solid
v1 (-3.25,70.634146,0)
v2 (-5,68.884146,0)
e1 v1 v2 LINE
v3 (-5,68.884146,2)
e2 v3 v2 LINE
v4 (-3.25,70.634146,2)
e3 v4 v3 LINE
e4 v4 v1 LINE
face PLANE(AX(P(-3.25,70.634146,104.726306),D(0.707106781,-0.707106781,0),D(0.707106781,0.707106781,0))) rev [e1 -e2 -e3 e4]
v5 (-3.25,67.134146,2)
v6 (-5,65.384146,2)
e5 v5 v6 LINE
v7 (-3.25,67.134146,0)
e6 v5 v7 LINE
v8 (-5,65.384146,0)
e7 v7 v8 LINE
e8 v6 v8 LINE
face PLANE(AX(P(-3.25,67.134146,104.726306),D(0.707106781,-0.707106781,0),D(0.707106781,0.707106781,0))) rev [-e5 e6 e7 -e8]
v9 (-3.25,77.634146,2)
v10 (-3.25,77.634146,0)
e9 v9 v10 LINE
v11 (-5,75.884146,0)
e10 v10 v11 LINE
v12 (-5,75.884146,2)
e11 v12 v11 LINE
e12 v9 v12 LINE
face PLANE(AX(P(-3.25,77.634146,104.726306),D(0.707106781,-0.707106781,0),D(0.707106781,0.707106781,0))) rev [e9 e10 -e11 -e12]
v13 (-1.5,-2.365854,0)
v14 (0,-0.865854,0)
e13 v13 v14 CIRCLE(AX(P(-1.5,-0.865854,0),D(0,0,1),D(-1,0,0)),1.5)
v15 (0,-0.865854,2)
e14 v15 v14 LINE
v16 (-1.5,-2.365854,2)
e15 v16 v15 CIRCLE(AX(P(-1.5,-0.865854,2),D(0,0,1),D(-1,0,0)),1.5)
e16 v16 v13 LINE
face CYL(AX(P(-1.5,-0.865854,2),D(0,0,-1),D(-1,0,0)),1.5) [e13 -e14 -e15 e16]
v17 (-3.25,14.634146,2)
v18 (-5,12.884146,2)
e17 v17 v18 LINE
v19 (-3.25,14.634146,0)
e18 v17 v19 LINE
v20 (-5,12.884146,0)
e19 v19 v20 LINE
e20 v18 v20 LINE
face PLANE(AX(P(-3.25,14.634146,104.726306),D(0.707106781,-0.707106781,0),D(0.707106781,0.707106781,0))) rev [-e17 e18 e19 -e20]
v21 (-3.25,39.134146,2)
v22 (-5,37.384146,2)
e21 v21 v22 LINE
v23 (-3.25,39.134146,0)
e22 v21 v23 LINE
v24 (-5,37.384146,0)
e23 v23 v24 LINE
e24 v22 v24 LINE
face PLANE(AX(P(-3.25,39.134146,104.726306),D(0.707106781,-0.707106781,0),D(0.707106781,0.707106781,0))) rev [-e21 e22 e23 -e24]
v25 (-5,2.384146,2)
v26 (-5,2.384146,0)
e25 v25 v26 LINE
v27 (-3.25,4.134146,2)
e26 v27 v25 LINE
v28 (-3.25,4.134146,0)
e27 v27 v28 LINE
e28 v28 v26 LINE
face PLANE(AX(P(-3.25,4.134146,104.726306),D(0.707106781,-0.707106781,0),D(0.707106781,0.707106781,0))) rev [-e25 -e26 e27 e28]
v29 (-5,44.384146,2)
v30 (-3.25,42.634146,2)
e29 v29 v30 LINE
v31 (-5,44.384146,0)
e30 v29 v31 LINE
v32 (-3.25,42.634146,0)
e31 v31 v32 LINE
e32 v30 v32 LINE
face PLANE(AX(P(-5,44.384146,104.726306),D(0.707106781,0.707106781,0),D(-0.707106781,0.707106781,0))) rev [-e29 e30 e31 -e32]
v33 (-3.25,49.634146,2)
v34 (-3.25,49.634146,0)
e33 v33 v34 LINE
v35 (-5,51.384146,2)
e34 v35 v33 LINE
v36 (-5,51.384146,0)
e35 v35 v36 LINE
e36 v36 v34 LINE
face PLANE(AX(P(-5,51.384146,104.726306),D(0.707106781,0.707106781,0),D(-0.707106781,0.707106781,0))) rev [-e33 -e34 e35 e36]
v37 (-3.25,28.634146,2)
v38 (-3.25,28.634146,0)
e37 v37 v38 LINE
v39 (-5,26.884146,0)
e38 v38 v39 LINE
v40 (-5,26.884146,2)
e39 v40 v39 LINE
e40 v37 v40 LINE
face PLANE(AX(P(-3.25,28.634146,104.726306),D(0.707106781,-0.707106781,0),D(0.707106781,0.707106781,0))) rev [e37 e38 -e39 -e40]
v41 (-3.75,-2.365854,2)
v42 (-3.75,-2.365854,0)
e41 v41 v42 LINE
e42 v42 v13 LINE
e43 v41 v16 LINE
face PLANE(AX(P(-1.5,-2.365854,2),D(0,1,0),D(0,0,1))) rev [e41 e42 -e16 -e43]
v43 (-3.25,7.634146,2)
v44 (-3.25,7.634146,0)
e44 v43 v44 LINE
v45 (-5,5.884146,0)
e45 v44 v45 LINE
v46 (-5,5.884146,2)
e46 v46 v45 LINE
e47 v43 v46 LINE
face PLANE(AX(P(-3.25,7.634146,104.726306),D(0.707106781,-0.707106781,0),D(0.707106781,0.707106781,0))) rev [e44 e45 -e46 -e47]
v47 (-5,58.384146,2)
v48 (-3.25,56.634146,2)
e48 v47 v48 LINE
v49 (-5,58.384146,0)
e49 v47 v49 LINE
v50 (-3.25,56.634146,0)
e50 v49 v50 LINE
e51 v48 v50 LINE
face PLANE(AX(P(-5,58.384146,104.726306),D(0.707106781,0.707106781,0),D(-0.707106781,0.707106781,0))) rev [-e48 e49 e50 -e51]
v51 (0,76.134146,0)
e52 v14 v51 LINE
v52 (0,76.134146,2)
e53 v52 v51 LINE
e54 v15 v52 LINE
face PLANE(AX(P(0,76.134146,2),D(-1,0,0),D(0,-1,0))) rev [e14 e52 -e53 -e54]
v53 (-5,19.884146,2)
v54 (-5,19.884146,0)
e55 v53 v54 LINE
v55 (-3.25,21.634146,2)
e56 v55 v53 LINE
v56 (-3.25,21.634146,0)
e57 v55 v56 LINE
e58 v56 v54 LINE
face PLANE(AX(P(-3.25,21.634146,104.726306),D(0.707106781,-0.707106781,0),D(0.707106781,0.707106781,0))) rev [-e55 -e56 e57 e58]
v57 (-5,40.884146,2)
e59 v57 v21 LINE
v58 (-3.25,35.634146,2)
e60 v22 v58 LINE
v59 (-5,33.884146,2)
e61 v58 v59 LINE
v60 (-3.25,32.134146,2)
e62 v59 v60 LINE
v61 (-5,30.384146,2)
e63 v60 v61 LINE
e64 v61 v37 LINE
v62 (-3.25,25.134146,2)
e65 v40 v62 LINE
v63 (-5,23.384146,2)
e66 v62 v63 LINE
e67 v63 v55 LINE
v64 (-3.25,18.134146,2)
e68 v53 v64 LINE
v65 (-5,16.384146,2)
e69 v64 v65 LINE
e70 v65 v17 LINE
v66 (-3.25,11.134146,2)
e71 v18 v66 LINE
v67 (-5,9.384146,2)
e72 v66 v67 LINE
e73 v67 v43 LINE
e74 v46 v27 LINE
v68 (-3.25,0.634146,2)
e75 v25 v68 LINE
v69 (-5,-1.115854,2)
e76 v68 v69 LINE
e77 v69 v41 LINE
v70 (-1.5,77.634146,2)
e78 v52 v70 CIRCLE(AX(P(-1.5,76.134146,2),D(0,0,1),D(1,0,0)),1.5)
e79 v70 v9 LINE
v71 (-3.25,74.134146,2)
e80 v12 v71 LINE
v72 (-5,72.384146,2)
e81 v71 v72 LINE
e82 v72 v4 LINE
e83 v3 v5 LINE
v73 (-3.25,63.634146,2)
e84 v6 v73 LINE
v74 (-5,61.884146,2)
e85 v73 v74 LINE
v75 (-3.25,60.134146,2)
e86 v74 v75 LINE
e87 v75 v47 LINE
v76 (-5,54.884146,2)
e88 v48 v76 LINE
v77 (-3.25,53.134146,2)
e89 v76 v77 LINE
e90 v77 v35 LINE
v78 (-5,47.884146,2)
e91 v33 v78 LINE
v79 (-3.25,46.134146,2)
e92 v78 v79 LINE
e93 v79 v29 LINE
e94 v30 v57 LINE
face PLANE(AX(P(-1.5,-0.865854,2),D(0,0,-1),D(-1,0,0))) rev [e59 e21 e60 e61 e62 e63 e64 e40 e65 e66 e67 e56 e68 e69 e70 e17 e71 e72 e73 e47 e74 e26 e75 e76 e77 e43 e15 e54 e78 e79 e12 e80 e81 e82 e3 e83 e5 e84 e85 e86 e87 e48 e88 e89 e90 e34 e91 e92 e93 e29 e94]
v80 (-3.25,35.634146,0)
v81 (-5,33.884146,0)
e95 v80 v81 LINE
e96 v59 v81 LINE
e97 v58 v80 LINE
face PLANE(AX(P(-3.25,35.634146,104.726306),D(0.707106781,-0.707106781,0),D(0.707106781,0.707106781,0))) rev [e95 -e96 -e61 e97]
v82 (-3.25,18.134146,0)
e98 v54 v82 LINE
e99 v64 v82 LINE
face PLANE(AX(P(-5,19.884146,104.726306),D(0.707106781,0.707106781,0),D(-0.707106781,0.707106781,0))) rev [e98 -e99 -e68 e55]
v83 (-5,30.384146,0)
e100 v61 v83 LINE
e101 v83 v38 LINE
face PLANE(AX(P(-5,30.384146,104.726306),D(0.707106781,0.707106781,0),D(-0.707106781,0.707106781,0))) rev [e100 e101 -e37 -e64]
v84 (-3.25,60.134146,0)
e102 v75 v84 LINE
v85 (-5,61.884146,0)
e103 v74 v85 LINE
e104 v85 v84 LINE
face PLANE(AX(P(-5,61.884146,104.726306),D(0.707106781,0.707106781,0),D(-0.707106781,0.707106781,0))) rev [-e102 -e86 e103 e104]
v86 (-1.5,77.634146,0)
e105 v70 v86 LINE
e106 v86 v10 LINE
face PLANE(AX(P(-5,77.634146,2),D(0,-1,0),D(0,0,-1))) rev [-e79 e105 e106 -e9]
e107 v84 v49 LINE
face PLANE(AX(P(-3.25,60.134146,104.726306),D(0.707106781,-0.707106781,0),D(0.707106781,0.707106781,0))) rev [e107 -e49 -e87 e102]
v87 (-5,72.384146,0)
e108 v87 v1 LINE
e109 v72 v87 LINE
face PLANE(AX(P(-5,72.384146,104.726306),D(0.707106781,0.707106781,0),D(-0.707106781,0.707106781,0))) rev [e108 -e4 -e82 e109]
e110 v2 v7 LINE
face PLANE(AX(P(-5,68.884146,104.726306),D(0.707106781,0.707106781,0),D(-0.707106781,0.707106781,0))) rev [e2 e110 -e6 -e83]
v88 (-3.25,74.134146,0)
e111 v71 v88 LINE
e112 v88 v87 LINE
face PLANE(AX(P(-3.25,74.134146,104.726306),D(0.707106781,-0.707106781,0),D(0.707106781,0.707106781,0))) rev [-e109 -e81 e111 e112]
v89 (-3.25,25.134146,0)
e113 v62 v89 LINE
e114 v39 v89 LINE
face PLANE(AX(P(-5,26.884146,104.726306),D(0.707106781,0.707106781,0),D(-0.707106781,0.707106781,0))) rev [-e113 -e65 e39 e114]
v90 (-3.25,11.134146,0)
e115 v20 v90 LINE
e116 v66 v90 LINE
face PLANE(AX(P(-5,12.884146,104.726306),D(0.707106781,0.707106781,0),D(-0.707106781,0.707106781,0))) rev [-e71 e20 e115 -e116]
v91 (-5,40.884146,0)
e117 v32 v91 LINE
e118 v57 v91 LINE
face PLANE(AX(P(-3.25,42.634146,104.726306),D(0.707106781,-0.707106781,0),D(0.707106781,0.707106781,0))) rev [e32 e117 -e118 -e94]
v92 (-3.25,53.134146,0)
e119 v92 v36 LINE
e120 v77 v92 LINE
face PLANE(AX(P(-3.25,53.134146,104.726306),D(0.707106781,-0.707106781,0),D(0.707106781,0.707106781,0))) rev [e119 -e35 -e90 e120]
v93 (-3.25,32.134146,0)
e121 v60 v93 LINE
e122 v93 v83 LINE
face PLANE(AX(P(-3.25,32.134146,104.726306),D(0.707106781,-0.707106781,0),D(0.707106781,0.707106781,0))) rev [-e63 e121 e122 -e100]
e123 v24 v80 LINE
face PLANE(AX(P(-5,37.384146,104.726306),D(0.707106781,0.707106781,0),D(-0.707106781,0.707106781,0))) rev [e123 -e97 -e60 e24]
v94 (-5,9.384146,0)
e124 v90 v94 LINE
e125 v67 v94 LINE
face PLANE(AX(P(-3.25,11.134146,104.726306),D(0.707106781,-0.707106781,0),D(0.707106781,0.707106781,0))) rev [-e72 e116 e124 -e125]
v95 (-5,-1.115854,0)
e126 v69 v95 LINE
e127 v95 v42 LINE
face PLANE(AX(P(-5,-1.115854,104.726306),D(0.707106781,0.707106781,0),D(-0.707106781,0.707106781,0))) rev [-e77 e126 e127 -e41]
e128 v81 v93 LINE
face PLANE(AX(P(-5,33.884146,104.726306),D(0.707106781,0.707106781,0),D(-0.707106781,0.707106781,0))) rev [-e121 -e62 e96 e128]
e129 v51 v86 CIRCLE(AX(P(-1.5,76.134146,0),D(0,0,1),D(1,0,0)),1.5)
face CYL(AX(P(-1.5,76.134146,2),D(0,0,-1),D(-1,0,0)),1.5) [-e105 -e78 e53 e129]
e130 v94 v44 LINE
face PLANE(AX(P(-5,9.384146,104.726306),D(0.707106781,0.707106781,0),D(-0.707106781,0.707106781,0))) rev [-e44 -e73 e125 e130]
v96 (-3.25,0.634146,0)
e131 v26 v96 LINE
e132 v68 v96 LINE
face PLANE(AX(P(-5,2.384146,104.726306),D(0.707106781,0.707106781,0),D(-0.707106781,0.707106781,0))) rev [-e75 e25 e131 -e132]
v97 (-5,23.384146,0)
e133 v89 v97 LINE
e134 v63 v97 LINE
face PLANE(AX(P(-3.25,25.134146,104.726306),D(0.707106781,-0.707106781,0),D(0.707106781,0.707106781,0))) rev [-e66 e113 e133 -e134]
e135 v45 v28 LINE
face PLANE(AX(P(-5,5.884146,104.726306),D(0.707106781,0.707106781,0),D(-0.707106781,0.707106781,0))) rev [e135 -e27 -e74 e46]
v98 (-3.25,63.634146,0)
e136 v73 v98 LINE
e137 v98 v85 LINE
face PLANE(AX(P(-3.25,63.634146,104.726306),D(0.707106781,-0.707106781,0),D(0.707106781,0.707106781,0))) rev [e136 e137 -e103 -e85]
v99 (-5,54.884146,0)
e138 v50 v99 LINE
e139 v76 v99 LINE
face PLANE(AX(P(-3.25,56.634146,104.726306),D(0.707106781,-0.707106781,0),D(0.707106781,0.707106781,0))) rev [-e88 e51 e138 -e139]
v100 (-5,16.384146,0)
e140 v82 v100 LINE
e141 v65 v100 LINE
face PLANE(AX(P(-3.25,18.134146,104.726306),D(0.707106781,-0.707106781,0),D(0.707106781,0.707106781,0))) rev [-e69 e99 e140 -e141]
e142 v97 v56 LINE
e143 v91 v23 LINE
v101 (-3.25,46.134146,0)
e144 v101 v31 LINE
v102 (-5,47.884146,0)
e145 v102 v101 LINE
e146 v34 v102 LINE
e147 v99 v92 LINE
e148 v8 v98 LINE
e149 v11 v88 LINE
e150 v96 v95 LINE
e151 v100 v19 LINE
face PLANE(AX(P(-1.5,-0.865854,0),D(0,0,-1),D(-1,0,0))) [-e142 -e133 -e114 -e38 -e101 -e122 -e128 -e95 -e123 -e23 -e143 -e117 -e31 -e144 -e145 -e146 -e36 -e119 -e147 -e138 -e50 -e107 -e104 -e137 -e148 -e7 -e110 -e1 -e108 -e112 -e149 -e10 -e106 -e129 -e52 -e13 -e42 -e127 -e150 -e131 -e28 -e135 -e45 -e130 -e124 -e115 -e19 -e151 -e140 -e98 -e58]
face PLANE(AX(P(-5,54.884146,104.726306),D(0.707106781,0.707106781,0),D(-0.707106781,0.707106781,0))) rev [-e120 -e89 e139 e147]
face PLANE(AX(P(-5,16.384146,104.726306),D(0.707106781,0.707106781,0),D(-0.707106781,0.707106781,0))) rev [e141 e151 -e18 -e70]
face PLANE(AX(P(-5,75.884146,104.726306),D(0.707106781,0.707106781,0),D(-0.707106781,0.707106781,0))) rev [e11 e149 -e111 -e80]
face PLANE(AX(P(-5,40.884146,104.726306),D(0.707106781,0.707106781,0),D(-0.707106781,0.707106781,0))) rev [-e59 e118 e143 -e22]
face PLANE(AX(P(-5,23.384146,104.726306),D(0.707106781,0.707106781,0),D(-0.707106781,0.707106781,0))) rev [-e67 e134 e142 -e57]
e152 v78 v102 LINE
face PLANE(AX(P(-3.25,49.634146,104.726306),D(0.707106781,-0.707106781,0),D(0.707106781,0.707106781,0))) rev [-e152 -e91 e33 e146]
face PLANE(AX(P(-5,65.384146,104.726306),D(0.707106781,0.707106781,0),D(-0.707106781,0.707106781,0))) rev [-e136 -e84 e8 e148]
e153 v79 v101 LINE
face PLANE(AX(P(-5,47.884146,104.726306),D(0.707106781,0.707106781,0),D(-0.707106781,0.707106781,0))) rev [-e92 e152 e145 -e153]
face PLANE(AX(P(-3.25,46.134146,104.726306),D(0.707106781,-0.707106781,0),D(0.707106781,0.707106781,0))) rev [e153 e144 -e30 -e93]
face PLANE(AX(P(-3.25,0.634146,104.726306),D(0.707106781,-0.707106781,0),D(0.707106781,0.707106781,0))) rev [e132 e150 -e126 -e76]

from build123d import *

# Parameters (mm, degrees)
BOSS_EXTRUDE1_DEPTH = 2
CUT_EXTRUDE4_START  = -2
CUT_EXTRUDE4_DEPTH  = 2


# Read off the part's stored shape, not the designer's step: Cut-Extrude4
with BuildPart() as part:
    # Sketch1 → Boss-Extrude1 (new body)
    with BuildSketch(Plane.XY):
        with BuildLine():
            Line((0, 76.134146341), (0, -0.865853659))
            ThreePointArc((0, -0.865853659), (-0.439339828, -1.92651383), (-1.5, -2.365853659))
            Line((-1.5, -2.365853659), (-5, -2.365853659))
            Line((-5, -2.365853659), (-5, 77.634146341))
            Line((-5, 77.634146341), (-1.5, 77.634146341))
            ThreePointArc((-1.5, 77.634146341), (-0.439339828, 77.194806513), (0, 76.134146341))
        make_face()
    extrude(amount=BOSS_EXTRUDE1_DEPTH)

    # Cut-Extrude4 outline → Cut-Extrude4 (cut)
    with BuildSketch(Plane.XY.offset(2).offset(CUT_EXTRUDE4_START)):
        Polygon((-5, 77.634146341), (-5, 75.884146341), (-3.25, 77.634146341), align=None)
        Polygon((-3.75, -2.365853659), (-5, -1.115853659), (-5, -2.365853659), align=None)
        Polygon((-3.25, 0.634146341), (-5, 2.384146341), (-5, -1.115853659), align=None)
        Polygon((-3.25, 4.134146341), (-5, 5.884146341), (-5, 2.384146341), align=None)
        Polygon((-3.25, 7.634146341), (-5, 9.384146341), (-5, 5.884146341), align=None)
        Polygon((-3.25, 11.134146341), (-5, 12.884146341), (-5, 9.384146341), align=None)
        Polygon((-3.25, 14.634146341), (-5, 16.384146341), (-5, 12.884146341), align=None)
        Polygon((-3.25, 18.134146341), (-5, 19.884146341), (-5, 16.384146341), align=None)
        Polygon((-3.25, 21.634146341), (-5, 23.384146341), (-5, 19.884146341), align=None)
        Polygon((-3.25, 25.134146341), (-5, 26.884146341), (-5, 23.384146341), align=None)
        Polygon((-3.25, 28.634146341), (-5, 30.384146341), (-5, 26.884146341), align=None)
        Polygon((-3.25, 32.134146341), (-5, 33.884146341), (-5, 30.384146341), align=None)
        Polygon((-3.25, 35.634146341), (-5, 37.384146341), (-5, 33.884146341), align=None)
        Polygon((-3.25, 39.134146341), (-5, 40.884146341), (-5, 37.384146341), align=None)
        Polygon((-3.25, 42.634146341), (-5, 44.384146341), (-5, 40.884146341), align=None)
        Polygon((-3.25, 46.134146341), (-5, 47.884146341), (-5, 44.384146341), align=None)
        Polygon((-3.25, 49.634146341), (-5, 51.384146341), (-5, 47.884146341), align=None)
        Polygon((-3.25, 53.134146341), (-5, 54.884146341), (-5, 51.384146341), align=None)
        Polygon((-3.25, 56.634146341), (-5, 58.384146341), (-5, 54.884146341), align=None)
        Polygon((-3.25, 60.134146341), (-5, 61.884146341), (-5, 58.384146341), align=None)
        Polygon((-3.25, 63.634146341), (-5, 65.384146341), (-5, 61.884146341), align=None)
        Polygon((-3.25, 67.134146341), (-5, 68.884146341), (-5, 65.384146341), align=None)
        Polygon((-3.25, 70.634146341), (-5, 72.384146341), (-5, 68.884146341), align=None)
        Polygon((-3.25, 74.134146341), (-5, 75.884146341), (-5, 72.384146341), align=None)
    extrude(amount=CUT_EXTRUDE4_DEPTH, mode=Mode.SUBTRACT)


solid = part.part
